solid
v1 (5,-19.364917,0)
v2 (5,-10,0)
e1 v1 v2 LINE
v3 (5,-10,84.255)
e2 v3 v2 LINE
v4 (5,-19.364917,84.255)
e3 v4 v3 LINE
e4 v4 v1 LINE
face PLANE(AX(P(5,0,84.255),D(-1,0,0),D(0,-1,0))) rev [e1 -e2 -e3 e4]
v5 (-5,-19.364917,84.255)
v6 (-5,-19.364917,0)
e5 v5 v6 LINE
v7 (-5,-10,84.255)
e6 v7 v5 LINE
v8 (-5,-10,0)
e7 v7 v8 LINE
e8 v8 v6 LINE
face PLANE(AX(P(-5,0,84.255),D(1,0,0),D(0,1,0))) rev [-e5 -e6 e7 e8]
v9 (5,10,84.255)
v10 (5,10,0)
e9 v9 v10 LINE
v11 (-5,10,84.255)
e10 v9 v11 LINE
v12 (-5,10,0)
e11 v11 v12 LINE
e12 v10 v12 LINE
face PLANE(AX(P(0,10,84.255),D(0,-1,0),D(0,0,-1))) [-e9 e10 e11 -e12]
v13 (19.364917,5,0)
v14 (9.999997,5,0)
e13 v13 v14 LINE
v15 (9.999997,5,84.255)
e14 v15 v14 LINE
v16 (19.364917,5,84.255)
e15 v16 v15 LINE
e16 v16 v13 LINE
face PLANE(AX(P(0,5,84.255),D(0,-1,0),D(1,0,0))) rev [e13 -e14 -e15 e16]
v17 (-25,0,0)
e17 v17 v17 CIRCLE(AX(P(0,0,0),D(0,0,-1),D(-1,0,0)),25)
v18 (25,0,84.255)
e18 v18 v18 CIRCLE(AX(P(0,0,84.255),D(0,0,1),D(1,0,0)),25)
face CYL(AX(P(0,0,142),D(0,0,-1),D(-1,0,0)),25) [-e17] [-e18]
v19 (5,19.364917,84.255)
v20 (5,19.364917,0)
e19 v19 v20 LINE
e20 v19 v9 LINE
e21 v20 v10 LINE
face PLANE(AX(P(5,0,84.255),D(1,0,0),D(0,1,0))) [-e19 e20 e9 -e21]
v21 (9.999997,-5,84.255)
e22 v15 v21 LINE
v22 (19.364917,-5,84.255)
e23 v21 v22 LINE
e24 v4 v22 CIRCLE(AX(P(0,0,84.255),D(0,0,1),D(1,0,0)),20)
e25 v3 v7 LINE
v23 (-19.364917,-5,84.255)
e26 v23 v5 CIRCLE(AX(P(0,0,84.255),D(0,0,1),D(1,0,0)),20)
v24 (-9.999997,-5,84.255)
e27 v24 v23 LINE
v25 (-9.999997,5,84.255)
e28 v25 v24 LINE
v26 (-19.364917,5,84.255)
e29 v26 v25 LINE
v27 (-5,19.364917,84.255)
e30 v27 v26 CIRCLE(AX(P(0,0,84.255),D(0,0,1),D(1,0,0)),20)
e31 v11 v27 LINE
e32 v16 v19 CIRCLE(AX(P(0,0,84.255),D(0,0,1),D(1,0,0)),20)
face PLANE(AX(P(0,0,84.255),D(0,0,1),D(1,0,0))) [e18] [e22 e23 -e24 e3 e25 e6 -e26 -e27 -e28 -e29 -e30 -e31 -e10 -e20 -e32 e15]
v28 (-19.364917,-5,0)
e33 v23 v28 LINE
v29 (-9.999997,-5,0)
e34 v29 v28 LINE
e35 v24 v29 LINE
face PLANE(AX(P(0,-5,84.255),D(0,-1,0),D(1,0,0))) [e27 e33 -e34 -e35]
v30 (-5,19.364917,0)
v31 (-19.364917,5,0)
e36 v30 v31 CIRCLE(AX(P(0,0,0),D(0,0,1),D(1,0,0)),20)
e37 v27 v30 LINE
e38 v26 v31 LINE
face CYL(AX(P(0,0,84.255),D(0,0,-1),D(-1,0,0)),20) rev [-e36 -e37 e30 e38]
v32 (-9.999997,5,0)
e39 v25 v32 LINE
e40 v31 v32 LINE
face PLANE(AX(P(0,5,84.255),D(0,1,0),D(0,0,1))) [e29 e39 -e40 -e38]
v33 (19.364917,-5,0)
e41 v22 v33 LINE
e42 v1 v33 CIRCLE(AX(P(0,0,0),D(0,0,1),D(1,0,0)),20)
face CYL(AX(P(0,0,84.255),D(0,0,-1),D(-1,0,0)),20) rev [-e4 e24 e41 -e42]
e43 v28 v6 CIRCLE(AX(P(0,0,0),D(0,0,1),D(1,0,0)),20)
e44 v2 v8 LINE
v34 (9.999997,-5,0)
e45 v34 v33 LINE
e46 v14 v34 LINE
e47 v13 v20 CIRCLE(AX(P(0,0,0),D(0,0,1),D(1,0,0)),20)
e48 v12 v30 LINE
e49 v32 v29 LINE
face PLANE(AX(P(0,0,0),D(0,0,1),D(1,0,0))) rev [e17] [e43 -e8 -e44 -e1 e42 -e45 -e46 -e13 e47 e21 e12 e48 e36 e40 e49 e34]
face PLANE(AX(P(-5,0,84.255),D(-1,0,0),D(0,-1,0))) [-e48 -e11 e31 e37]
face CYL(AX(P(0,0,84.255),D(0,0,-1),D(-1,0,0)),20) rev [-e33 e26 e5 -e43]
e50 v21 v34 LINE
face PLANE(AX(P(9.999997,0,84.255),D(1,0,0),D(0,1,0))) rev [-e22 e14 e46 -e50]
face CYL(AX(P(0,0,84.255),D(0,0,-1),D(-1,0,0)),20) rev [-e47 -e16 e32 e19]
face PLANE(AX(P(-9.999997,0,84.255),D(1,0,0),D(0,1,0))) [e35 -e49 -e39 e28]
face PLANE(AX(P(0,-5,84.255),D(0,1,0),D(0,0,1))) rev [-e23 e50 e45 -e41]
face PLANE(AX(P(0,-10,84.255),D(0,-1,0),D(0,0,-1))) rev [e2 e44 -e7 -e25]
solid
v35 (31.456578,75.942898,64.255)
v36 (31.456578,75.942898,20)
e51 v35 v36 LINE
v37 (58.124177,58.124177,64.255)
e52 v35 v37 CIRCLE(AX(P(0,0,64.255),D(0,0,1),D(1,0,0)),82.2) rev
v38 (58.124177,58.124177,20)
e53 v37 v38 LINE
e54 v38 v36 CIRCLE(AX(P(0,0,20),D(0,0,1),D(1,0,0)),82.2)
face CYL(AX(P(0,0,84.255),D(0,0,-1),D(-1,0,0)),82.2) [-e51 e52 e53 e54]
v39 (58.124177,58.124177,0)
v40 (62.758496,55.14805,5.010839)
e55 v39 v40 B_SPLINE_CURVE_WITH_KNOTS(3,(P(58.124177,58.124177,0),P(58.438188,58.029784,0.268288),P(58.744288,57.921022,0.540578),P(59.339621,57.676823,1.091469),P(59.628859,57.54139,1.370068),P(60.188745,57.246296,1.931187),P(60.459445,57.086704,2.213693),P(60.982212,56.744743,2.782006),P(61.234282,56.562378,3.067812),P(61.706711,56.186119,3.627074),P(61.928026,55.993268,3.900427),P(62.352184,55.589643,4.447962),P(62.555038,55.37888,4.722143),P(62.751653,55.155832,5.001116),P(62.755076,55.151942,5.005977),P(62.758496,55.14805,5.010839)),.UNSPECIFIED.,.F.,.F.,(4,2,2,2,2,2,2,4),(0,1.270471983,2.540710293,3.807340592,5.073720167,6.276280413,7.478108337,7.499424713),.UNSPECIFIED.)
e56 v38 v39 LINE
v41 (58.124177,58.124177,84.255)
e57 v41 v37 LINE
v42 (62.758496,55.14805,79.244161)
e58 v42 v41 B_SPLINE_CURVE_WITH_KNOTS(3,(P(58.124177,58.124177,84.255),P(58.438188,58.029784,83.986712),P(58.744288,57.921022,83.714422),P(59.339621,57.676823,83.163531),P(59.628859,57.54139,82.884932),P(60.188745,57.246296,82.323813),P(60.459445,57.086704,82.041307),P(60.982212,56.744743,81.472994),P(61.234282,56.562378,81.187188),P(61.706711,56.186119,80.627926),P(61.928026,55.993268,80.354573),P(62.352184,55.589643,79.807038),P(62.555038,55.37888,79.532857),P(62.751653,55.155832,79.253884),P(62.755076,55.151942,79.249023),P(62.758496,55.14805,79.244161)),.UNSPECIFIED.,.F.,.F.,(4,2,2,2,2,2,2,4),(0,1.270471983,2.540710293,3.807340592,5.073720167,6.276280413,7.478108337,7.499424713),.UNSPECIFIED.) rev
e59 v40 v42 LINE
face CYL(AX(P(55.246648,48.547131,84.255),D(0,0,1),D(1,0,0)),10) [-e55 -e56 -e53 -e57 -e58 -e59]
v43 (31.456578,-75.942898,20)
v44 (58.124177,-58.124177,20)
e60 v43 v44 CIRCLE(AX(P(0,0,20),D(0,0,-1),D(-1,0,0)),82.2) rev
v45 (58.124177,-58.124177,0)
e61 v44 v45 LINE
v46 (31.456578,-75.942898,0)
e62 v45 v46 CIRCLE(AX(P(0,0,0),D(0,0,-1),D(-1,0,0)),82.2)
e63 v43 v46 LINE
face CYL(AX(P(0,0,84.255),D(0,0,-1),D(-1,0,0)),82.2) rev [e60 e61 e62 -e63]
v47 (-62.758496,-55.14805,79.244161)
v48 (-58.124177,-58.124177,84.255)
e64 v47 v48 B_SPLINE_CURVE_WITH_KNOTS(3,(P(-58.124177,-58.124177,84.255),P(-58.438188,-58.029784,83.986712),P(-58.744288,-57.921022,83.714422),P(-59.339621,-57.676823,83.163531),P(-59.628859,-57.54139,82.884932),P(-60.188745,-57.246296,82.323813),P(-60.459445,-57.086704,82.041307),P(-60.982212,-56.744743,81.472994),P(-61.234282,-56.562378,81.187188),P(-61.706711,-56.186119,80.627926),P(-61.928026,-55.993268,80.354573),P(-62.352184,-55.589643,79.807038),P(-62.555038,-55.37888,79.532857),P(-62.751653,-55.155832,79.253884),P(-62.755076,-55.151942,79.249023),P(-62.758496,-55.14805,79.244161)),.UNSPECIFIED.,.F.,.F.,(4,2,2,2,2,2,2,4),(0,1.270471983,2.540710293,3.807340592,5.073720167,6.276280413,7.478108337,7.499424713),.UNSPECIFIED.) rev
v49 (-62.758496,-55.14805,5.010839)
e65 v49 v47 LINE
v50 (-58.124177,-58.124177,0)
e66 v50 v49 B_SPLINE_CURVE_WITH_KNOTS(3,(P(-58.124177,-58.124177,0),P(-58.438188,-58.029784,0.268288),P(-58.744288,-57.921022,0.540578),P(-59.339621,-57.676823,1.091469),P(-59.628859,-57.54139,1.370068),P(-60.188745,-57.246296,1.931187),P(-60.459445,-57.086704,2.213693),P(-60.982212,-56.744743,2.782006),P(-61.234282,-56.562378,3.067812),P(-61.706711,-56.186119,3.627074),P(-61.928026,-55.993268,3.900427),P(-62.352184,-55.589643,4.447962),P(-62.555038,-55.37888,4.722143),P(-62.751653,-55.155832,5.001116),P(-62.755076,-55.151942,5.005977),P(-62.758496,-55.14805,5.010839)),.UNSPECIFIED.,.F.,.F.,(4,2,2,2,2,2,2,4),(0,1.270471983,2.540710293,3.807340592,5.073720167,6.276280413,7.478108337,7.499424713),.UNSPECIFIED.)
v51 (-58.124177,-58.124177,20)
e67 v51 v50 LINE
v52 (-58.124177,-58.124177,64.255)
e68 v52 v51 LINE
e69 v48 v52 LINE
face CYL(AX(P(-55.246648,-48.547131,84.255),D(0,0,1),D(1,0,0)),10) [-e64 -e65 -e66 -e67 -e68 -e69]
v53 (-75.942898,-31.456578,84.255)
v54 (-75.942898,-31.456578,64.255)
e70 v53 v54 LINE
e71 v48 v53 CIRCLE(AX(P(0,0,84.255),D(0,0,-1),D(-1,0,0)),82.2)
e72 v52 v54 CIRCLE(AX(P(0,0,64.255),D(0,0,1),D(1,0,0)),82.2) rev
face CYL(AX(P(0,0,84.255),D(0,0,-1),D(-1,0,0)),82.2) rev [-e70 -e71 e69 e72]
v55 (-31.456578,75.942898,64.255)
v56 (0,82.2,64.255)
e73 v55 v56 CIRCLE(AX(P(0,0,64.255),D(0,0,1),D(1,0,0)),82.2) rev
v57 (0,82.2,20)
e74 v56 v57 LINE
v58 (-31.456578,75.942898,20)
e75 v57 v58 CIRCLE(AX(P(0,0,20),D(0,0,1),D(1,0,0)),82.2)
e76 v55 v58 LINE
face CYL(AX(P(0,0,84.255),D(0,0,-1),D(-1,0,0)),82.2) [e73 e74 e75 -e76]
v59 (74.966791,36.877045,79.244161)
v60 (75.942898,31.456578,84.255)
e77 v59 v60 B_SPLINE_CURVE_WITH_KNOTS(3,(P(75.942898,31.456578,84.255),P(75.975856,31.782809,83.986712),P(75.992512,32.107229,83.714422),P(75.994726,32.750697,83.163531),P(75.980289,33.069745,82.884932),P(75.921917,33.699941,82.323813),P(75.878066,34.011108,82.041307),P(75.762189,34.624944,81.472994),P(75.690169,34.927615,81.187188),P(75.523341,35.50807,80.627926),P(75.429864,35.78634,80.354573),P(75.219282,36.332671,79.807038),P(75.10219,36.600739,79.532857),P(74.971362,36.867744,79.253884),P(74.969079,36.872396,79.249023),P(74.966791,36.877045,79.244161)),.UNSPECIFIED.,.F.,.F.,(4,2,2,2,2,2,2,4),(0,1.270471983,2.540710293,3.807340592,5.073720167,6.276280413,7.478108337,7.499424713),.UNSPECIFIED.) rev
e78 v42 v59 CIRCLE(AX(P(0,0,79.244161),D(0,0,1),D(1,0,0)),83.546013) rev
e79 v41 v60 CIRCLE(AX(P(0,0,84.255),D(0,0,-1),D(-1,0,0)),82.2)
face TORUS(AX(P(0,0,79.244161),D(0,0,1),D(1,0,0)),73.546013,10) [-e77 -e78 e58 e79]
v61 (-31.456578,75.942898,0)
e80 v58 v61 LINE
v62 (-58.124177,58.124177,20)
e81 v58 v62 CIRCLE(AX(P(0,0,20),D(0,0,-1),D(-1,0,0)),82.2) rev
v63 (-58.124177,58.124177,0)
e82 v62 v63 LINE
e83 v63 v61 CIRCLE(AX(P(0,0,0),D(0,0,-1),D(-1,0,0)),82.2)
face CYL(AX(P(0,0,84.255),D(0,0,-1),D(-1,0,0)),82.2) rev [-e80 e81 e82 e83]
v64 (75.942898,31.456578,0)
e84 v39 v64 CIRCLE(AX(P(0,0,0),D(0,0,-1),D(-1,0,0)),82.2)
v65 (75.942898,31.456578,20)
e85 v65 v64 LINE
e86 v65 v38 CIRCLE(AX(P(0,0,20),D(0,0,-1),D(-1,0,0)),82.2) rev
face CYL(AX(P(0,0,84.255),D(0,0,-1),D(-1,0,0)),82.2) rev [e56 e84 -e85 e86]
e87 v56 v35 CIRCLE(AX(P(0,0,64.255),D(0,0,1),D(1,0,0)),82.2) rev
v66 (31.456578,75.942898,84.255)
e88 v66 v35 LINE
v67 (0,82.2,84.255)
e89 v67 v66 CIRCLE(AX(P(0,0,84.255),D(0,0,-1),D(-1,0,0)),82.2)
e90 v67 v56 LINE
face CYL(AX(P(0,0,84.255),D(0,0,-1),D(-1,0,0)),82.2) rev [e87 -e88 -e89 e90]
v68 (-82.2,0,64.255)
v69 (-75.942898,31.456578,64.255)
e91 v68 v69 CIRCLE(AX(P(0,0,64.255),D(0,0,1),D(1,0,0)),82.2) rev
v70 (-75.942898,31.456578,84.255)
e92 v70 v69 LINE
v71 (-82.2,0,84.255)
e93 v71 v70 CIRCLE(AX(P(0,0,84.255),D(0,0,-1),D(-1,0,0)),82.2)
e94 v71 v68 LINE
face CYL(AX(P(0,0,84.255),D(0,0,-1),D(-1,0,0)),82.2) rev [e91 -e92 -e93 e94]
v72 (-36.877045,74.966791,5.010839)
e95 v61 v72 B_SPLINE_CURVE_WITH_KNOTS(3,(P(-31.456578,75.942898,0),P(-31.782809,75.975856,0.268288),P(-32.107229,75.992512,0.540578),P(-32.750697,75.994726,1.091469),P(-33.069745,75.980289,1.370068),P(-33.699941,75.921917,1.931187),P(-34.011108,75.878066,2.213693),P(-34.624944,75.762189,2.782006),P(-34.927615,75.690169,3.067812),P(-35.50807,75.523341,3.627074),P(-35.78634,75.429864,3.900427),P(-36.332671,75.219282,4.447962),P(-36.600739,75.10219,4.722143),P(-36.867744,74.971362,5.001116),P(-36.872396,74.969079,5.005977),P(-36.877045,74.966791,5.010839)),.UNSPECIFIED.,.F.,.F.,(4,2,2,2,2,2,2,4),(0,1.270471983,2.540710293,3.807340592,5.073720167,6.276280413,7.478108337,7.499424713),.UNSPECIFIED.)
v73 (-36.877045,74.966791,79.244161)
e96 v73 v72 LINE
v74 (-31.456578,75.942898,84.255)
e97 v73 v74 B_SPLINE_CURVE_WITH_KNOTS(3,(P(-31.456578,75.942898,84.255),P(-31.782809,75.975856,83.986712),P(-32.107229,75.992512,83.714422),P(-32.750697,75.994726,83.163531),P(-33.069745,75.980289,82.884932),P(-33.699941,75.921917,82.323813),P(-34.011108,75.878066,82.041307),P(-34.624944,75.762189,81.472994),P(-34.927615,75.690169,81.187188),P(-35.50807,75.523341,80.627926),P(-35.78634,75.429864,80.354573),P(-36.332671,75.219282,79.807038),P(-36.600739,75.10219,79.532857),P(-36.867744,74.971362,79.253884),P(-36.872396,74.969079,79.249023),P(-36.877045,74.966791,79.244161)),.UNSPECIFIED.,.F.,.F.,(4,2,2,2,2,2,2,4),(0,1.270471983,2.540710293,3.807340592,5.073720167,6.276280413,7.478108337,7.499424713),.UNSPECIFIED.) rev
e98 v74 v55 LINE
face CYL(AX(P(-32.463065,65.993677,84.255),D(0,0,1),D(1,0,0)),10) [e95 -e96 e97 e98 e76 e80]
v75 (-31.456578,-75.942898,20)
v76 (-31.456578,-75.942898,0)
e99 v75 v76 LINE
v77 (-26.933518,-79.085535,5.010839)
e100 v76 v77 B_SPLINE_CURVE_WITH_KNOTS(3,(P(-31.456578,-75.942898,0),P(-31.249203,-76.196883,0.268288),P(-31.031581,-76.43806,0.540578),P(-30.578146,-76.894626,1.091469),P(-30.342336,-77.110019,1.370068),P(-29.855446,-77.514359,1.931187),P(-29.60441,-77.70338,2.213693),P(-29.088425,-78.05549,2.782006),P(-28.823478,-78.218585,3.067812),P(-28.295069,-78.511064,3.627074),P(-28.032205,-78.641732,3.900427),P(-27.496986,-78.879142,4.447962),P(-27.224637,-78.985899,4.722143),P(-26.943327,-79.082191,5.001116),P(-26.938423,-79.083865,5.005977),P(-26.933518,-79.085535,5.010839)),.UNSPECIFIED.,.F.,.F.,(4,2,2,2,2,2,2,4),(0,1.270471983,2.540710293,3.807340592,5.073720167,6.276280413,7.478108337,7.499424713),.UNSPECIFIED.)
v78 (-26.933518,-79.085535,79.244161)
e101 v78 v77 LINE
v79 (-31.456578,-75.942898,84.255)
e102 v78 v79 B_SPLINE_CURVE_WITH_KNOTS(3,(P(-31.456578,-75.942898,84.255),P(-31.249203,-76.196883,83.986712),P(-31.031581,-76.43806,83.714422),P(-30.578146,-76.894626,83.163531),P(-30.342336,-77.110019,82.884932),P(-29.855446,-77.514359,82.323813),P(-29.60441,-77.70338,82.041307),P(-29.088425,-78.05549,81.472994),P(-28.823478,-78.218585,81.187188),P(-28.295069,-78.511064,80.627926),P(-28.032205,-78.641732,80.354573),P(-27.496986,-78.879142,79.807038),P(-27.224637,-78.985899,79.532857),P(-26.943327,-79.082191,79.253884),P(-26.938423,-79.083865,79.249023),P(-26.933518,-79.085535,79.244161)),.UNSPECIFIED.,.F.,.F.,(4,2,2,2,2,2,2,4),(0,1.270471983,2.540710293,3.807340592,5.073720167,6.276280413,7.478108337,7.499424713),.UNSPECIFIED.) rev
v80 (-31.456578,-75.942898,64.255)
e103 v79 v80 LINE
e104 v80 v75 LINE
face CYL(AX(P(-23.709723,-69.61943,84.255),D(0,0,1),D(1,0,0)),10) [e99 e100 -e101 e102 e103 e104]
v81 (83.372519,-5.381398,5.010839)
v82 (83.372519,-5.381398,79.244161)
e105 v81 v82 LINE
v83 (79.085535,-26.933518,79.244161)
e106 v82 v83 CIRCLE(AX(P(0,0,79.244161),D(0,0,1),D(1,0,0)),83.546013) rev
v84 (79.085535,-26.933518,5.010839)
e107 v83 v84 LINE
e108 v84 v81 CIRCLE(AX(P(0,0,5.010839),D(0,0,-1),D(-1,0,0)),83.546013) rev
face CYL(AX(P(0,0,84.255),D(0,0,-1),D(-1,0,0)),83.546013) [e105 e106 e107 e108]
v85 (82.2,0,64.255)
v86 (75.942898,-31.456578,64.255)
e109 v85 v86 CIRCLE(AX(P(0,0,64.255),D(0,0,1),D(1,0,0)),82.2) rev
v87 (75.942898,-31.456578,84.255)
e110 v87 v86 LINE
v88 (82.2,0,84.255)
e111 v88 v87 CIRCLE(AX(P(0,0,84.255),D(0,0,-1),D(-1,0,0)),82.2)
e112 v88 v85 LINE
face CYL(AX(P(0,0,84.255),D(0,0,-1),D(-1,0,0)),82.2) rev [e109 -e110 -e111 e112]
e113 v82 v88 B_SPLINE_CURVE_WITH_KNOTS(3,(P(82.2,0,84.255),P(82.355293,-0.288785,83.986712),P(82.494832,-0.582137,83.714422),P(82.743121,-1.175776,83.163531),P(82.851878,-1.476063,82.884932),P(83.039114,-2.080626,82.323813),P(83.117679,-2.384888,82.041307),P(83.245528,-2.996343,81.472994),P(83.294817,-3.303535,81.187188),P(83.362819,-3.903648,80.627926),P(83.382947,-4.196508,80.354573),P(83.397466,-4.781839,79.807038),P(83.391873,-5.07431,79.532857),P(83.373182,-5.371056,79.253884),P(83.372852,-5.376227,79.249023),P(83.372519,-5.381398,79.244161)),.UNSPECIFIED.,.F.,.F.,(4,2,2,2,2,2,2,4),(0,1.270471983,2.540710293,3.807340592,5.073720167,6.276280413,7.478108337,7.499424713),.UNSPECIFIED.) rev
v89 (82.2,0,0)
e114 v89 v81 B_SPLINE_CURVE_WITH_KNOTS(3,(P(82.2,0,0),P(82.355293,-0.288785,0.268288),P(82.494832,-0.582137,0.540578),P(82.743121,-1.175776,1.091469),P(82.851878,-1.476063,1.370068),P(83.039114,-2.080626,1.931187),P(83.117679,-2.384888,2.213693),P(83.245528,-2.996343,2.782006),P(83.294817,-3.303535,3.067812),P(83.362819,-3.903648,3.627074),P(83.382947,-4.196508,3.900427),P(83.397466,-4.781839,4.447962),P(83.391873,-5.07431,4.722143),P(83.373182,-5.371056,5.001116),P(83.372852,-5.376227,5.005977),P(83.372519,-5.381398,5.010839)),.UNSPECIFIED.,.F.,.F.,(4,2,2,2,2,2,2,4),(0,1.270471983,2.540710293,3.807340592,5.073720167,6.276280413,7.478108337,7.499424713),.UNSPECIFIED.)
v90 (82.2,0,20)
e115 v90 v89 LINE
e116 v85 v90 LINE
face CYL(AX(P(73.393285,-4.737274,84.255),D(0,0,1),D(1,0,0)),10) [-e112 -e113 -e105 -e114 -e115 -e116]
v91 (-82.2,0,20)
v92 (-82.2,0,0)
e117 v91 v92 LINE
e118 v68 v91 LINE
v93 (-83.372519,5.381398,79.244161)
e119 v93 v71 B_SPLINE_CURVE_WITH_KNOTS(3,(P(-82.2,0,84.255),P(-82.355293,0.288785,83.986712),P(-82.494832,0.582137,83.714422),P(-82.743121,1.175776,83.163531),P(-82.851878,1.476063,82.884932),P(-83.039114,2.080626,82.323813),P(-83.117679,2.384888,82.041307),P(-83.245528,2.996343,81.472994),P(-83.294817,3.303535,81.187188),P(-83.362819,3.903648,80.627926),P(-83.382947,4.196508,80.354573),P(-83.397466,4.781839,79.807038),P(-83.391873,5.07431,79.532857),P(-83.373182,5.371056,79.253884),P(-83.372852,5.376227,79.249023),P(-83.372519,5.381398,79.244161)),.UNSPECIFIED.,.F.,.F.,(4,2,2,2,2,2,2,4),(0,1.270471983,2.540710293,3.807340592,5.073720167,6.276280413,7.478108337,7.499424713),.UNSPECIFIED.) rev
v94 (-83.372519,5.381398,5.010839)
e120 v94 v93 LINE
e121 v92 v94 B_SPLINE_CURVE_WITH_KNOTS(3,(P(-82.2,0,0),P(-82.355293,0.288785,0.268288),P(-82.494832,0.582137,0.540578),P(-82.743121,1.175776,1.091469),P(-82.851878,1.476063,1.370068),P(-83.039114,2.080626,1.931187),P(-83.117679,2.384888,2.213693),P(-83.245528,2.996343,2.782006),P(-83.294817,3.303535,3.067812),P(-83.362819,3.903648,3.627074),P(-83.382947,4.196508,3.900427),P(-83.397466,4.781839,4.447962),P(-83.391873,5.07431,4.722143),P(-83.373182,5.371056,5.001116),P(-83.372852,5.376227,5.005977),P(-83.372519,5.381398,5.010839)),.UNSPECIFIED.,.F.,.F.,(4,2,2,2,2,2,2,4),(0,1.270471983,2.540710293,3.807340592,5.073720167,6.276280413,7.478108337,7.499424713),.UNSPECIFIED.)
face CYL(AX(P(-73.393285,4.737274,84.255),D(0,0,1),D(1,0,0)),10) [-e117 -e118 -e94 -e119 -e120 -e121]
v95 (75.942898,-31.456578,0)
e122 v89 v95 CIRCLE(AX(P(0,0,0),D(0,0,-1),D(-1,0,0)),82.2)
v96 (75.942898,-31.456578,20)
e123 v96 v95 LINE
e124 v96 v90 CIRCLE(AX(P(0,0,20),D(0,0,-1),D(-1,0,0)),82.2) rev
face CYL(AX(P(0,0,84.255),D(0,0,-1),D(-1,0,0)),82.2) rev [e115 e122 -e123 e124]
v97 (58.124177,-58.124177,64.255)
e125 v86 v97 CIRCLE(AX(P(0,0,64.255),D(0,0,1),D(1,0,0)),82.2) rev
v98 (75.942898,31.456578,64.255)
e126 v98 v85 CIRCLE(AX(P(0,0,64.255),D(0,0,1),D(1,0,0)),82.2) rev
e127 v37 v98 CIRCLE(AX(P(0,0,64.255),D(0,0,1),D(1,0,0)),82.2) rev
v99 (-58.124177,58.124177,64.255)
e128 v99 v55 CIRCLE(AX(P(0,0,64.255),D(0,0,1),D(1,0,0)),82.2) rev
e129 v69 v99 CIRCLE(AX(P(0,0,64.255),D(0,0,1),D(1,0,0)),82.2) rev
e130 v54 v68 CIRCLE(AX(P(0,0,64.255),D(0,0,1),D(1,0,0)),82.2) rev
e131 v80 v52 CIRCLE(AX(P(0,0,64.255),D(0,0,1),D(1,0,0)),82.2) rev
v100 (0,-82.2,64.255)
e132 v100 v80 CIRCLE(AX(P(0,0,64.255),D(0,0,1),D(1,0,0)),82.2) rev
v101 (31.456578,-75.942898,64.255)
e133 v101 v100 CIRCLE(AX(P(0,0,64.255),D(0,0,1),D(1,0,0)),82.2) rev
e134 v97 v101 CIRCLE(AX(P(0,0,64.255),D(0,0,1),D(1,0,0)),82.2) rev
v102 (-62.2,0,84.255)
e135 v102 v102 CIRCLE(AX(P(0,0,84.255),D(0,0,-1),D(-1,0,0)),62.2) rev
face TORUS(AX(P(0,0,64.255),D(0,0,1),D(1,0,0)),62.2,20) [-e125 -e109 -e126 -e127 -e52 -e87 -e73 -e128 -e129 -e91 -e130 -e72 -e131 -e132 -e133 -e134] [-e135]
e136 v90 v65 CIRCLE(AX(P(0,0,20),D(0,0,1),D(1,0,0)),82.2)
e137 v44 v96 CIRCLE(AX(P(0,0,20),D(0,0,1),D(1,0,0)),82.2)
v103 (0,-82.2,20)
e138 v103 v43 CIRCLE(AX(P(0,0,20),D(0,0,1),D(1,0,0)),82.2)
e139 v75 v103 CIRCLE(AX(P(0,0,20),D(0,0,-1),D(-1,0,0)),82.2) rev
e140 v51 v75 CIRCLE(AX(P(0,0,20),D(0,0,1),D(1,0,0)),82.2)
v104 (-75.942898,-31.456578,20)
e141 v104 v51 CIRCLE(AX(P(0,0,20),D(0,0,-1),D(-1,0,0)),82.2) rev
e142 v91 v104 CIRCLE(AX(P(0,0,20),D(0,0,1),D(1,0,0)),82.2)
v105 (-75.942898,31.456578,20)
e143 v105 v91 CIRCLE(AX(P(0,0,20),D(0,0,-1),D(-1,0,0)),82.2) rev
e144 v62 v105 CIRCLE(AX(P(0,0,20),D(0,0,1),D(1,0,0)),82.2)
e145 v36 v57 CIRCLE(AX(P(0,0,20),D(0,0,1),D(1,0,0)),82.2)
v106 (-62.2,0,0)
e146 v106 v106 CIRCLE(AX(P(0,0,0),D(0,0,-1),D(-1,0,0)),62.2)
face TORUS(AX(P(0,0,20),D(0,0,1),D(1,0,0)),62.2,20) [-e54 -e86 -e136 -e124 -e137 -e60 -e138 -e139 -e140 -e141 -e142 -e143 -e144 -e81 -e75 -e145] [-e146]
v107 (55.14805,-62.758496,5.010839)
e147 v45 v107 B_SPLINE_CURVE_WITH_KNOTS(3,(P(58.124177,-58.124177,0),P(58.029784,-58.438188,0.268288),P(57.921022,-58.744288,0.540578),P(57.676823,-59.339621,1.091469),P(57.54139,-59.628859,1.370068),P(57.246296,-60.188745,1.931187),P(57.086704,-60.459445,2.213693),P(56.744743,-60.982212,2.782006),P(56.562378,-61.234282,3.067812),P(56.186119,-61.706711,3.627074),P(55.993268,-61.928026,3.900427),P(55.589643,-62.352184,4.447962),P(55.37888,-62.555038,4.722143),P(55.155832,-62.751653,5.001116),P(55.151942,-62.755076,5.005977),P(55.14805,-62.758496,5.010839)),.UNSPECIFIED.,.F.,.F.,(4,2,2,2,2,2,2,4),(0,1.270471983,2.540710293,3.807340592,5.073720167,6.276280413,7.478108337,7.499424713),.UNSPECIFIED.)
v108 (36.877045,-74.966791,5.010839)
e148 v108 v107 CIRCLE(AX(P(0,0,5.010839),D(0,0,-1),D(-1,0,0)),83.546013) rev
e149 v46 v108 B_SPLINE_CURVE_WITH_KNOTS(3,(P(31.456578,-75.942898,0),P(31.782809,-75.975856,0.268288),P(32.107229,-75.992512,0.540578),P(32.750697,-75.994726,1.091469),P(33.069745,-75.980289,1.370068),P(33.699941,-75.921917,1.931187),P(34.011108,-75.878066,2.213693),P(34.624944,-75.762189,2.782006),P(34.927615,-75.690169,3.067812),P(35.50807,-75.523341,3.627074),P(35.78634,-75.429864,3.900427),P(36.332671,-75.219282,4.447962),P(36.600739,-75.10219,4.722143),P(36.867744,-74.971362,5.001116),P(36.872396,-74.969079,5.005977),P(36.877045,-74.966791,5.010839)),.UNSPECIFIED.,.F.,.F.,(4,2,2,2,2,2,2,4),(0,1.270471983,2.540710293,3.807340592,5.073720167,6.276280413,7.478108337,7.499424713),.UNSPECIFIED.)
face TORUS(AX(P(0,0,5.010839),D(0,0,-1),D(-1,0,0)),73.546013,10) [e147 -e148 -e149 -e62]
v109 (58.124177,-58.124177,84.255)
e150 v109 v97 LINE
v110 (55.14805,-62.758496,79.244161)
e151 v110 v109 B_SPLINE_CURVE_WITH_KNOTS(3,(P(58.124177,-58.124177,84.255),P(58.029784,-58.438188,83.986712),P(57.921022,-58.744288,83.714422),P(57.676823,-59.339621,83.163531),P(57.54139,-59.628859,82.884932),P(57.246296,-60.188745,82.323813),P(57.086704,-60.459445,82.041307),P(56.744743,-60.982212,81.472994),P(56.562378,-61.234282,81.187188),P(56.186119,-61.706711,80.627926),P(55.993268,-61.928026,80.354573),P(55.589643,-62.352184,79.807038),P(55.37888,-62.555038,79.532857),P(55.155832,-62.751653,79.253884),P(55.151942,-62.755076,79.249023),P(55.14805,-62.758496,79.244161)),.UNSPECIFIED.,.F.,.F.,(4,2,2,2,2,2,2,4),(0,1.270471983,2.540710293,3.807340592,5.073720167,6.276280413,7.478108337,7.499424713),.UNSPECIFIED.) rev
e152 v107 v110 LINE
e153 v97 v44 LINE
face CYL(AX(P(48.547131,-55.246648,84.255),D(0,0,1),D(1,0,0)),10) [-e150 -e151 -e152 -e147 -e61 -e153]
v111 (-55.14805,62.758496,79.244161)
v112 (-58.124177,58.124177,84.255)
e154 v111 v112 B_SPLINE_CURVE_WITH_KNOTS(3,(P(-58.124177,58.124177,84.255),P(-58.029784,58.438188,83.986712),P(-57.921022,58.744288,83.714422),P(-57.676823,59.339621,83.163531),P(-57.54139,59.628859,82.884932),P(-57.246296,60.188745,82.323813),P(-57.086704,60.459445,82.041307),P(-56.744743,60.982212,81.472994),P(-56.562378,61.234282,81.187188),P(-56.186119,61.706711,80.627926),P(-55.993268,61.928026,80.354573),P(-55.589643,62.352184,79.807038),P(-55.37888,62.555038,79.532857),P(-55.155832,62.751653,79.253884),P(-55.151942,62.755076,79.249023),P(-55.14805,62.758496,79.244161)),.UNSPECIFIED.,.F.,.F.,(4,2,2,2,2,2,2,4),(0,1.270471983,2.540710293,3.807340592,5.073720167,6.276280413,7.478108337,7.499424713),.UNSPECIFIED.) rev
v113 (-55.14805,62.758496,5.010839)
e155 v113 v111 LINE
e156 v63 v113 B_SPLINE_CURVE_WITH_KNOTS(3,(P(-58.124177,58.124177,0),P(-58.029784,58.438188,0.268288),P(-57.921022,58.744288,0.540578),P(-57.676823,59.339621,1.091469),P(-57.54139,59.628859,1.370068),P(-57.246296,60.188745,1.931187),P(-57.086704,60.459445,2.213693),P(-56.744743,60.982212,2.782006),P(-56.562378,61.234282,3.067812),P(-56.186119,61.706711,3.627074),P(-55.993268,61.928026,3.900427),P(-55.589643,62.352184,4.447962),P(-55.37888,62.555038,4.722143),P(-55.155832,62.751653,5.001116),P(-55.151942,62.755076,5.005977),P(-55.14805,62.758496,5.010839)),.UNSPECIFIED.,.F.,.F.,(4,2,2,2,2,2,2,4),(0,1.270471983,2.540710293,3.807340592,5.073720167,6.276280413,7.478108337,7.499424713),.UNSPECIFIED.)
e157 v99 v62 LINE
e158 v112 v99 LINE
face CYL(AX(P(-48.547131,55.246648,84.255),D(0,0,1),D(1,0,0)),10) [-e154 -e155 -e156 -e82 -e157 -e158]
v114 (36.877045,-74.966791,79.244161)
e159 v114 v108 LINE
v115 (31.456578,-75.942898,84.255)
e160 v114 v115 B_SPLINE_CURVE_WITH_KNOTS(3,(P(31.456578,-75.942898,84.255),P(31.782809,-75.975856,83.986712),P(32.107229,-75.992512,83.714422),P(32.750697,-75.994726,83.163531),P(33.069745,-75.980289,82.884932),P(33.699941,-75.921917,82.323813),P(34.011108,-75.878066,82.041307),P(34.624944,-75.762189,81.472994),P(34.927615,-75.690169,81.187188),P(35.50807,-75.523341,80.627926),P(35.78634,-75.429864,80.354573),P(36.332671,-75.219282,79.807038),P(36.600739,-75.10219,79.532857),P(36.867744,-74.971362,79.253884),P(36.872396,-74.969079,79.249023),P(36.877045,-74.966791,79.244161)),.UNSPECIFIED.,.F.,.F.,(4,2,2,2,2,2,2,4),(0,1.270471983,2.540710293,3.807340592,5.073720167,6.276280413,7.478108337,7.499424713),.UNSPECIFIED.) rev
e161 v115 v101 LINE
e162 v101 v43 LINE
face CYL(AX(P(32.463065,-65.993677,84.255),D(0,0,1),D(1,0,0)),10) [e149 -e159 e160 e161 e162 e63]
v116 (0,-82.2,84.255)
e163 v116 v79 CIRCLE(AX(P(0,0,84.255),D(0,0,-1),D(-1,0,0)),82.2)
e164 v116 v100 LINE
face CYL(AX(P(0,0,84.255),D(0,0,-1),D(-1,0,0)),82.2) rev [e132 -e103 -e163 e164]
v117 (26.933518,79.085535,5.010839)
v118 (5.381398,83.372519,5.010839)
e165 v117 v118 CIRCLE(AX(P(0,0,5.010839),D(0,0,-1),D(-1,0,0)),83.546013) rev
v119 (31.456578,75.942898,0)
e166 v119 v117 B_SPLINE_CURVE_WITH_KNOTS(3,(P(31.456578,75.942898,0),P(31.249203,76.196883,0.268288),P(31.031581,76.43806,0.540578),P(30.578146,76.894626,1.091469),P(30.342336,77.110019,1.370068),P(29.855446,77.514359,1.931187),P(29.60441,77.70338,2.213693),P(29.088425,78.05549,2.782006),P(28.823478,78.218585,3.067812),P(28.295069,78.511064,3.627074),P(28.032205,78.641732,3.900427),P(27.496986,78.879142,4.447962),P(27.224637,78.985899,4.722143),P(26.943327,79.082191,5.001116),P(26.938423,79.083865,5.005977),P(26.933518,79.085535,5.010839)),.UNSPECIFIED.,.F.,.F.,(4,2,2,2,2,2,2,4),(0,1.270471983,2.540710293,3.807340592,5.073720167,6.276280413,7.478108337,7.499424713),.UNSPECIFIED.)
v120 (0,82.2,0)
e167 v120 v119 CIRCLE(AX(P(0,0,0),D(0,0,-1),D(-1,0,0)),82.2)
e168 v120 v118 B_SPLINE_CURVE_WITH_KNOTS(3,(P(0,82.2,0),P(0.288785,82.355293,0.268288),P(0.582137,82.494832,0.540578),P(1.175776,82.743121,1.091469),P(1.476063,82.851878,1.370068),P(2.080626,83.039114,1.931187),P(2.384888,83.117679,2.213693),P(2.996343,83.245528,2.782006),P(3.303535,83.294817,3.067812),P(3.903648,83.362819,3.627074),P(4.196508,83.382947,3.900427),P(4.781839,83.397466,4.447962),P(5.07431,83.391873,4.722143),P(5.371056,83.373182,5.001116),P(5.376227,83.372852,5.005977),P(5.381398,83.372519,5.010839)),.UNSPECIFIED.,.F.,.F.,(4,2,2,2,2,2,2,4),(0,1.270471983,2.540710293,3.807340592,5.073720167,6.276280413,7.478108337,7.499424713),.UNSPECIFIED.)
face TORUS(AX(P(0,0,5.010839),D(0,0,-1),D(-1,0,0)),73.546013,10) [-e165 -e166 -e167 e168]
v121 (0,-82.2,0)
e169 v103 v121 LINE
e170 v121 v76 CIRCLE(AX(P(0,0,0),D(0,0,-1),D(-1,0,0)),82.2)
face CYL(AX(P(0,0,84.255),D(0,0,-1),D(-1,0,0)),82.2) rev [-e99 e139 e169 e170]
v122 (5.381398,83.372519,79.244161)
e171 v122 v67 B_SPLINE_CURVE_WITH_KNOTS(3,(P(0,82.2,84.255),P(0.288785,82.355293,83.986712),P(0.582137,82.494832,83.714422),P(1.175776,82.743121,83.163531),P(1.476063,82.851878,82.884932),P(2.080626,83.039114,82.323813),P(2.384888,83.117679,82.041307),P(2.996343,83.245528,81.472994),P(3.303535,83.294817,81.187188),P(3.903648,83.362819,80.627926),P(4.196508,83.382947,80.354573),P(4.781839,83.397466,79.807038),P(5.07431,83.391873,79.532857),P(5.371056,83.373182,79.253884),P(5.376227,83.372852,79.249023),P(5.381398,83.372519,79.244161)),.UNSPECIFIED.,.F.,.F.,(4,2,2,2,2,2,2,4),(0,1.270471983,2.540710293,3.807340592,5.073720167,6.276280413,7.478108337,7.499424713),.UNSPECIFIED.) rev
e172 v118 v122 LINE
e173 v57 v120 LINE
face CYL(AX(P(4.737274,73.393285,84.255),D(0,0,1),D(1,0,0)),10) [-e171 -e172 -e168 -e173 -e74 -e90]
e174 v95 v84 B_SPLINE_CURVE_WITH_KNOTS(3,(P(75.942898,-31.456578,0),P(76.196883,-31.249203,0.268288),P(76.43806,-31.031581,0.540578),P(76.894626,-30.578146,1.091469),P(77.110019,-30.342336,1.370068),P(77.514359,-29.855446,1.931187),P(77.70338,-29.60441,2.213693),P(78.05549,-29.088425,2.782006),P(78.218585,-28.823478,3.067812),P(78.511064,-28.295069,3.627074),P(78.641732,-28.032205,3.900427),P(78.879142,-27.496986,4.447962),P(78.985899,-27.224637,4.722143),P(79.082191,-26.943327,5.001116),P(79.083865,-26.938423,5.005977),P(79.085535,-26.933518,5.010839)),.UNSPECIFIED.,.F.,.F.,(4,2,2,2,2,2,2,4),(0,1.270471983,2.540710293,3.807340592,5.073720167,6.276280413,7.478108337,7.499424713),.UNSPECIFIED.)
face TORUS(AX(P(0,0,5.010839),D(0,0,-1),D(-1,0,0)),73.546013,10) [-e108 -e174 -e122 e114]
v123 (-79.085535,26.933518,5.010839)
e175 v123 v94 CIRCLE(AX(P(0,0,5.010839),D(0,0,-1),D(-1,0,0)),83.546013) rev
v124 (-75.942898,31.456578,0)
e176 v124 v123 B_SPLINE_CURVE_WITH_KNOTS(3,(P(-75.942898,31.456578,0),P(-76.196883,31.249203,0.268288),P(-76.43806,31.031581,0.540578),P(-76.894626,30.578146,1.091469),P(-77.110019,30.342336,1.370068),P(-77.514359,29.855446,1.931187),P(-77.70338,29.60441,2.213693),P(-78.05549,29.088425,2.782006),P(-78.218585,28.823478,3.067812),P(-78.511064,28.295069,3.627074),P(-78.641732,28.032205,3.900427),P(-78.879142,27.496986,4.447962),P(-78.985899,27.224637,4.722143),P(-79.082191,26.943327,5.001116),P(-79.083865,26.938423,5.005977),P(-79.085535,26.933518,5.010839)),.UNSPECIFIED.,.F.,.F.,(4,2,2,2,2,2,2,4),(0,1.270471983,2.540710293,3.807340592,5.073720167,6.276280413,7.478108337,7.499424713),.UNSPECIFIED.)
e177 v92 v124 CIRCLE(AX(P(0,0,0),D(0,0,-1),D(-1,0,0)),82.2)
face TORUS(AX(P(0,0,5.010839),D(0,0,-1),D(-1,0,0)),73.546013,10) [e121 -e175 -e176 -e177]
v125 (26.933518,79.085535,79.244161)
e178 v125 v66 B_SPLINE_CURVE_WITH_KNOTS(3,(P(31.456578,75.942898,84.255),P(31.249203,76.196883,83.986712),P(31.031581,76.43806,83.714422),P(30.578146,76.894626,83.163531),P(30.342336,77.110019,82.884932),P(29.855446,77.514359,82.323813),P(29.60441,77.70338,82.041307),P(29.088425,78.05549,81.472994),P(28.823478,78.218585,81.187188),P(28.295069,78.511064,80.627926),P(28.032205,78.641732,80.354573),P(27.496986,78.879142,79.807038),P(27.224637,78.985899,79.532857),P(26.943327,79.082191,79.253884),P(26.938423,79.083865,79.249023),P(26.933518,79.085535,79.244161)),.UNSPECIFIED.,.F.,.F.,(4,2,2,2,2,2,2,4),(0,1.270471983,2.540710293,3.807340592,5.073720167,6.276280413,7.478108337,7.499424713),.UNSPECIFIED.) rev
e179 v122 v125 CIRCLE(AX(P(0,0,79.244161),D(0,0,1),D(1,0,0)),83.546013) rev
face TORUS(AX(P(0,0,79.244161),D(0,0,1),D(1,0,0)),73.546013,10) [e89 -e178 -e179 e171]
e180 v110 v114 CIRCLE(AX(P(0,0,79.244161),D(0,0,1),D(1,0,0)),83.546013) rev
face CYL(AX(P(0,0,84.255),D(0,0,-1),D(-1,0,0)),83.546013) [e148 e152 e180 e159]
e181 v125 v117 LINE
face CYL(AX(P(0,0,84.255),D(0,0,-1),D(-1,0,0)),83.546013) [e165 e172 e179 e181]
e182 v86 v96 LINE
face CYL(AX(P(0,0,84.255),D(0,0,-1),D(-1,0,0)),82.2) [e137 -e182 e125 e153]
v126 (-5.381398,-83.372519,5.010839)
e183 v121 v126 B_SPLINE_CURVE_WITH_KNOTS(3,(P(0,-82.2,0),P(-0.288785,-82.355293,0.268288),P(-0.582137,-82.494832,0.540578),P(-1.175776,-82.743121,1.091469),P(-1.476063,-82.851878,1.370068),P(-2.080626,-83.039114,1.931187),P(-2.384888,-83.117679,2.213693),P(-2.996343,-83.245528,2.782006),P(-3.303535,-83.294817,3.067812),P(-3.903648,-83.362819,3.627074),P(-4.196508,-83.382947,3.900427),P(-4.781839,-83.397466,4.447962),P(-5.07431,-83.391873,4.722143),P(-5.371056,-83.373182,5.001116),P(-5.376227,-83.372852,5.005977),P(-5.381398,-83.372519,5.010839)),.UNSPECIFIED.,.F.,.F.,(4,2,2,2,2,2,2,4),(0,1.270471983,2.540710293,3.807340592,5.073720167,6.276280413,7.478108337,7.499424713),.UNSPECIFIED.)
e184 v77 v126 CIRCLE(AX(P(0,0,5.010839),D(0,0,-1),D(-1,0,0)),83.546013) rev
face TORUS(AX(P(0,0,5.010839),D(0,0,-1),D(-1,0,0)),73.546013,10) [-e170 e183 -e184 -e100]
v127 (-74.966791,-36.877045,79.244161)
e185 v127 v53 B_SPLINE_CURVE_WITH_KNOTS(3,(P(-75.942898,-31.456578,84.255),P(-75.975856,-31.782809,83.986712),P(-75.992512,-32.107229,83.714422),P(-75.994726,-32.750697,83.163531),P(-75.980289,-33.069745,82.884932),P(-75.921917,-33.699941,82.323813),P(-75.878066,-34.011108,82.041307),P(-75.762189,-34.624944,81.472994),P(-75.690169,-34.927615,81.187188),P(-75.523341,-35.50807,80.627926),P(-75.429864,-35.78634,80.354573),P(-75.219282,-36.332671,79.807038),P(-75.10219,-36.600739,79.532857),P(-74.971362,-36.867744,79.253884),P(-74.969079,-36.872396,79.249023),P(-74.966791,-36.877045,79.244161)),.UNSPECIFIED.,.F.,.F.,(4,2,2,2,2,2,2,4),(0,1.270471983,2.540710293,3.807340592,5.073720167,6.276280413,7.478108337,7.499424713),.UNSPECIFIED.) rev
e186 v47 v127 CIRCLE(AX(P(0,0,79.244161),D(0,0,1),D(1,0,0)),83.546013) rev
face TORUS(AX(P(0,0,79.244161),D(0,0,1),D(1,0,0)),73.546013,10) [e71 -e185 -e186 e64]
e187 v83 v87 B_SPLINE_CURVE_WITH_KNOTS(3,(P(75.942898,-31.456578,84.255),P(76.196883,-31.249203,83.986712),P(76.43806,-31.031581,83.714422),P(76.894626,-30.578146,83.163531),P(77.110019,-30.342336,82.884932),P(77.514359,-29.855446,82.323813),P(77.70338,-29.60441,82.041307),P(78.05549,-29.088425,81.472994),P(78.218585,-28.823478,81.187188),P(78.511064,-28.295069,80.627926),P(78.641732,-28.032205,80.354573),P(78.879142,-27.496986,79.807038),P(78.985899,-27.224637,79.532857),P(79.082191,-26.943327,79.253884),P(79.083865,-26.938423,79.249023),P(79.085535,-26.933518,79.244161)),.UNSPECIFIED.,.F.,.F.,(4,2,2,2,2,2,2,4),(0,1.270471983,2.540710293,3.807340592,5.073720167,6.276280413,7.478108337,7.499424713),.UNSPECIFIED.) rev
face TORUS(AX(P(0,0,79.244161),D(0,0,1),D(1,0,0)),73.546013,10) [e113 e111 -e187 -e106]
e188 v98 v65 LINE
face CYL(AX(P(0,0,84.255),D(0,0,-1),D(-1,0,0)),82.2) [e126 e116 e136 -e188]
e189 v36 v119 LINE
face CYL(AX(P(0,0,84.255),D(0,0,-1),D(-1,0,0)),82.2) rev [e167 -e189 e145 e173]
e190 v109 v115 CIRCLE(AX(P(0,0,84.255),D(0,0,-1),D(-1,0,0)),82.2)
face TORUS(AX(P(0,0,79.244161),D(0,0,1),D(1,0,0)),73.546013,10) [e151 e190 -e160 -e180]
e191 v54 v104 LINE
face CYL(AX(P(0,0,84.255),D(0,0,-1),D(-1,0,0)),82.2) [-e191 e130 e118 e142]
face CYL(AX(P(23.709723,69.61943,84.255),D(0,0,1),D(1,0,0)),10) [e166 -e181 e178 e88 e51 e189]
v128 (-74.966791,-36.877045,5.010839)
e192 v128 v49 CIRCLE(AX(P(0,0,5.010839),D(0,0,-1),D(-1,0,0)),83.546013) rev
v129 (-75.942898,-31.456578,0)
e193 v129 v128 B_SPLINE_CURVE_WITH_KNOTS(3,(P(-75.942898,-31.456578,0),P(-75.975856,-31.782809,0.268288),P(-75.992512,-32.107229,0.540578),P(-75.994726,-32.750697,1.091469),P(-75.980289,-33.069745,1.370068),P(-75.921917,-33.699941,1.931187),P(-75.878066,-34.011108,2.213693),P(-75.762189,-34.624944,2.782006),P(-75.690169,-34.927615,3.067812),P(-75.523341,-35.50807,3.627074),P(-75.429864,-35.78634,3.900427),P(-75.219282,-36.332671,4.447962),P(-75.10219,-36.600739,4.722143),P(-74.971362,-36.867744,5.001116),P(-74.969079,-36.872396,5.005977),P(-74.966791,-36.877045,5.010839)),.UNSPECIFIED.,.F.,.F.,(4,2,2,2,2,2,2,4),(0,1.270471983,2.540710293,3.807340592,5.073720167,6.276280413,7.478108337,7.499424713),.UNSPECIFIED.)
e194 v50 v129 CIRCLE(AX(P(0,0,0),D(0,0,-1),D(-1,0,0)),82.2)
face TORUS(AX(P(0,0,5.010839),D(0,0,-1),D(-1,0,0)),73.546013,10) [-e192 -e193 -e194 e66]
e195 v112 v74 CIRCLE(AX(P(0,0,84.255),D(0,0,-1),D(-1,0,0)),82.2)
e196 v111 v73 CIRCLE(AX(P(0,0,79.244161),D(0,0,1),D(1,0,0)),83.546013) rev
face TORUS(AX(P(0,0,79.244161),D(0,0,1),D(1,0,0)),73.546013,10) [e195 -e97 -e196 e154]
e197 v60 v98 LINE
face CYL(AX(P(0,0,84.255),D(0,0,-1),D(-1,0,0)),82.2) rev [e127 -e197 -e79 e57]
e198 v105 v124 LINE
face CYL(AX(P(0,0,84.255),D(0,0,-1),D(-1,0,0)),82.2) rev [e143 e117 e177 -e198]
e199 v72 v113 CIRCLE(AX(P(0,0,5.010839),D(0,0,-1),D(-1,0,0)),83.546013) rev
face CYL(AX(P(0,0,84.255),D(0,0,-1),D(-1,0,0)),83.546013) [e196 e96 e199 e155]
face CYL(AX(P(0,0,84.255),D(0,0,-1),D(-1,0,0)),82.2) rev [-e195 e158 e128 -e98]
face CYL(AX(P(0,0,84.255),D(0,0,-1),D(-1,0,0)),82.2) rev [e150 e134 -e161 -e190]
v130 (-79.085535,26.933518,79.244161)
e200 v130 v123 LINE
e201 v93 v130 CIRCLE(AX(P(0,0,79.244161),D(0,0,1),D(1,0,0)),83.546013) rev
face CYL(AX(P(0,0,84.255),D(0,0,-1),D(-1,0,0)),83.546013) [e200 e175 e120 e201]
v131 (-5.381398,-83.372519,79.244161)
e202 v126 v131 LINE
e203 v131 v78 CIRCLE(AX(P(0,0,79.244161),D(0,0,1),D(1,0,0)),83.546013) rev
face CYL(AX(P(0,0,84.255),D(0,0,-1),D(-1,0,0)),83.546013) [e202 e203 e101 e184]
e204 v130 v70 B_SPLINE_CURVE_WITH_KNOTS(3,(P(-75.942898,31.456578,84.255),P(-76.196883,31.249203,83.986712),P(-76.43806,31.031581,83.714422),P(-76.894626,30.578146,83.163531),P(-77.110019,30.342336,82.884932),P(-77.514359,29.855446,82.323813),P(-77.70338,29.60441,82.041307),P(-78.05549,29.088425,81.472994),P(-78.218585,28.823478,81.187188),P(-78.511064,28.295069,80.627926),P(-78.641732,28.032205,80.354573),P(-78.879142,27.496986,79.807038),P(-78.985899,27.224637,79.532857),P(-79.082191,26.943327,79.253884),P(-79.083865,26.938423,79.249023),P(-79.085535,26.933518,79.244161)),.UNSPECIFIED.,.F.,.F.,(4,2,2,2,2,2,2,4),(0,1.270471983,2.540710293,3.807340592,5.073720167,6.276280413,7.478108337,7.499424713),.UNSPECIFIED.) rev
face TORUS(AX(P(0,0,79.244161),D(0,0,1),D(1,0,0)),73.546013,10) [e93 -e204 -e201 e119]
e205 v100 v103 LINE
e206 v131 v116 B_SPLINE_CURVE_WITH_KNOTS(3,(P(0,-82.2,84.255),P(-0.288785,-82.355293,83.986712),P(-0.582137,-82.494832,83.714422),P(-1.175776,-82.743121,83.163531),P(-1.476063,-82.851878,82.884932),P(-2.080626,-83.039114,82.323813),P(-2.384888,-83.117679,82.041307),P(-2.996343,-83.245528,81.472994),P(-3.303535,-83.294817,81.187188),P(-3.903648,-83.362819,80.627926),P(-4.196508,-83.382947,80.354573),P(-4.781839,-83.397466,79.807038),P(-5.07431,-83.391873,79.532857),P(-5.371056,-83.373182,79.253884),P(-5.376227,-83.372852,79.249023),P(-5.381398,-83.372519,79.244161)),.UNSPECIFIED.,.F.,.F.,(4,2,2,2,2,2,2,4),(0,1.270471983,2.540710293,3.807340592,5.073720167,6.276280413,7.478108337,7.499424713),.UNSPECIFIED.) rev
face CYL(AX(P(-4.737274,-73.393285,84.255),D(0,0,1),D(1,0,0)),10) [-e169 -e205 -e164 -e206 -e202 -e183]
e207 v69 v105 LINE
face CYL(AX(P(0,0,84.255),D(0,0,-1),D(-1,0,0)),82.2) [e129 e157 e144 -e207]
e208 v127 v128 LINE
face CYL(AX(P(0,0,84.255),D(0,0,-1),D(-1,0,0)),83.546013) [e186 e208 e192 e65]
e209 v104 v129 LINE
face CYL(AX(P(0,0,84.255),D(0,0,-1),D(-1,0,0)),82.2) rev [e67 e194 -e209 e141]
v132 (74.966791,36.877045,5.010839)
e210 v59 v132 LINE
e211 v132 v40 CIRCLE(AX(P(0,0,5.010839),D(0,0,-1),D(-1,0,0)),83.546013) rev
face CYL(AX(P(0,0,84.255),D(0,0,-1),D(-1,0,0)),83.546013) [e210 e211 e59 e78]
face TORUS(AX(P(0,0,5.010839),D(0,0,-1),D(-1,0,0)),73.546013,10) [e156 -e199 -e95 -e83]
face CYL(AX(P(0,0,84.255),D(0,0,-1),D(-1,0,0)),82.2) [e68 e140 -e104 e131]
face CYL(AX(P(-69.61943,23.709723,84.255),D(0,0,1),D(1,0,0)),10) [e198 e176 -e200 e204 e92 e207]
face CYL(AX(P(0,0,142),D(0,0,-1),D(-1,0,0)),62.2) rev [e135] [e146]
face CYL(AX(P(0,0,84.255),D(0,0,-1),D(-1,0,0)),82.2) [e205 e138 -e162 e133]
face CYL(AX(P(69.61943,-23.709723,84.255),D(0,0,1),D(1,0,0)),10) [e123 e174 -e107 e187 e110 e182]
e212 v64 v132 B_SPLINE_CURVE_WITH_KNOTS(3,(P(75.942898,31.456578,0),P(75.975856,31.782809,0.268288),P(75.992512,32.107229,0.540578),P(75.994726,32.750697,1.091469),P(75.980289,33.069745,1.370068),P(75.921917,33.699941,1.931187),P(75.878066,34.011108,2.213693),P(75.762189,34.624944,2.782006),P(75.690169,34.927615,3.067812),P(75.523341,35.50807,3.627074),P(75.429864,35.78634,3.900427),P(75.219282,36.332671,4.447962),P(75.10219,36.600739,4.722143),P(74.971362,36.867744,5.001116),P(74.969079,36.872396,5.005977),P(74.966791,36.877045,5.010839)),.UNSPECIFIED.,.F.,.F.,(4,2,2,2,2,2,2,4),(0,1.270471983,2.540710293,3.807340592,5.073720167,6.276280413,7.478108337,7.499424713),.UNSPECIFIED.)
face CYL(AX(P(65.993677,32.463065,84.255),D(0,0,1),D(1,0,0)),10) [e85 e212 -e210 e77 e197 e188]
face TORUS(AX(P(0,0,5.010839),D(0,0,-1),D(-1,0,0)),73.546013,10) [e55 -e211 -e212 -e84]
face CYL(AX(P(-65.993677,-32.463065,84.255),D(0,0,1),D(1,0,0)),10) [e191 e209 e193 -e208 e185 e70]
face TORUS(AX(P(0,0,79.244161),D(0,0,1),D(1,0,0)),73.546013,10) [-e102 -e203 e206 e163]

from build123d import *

# Parameters (mm, degrees)
SKETCH1_R           = 82.2
SKETCH1_R_2         = 20
BOSS_EXTRUDE1_DEPTH = 84.255
BOSS_EXTRUDE2_DEPTH = 84.255
FILLET1_R           = 20
SKETCH3_R           = 62.2
SKETCH3_R_2         = 25
CUT_EXTRUDE1_DEPTH  = 142
BOSS_EXTRUDE3_DEPTH = 84.255
FILLET2_DEPTH       = 84.255


with BuildPart() as part:
    # Sketch1 → Boss-Extrude1 (new body)
    with BuildSketch(Plane.XY):
        Circle(SKETCH1_R)
        Circle(SKETCH1_R_2, mode=Mode.SUBTRACT)
    extrude(amount=BOSS_EXTRUDE1_DEPTH)

    # Sketch2 → Boss-Extrude2 (add)
    with BuildSketch(Plane(origin=(0, 0, 0), x_dir=(-1, 0, 0), z_dir=(0, 0, -1))):
        with BuildLine():
            ThreePointArc((20, 0), (19.840593925, 2.52008585), (19.364916731, 5))
            Line((19.364916731, 5), (9.999996731, 5))
            Line((9.999996731, 5), (9.999996731, -5))
            Line((9.999996731, -5), (19.364916731, -5))
            ThreePointArc((19.364916731, -5), (19.840593925, -2.52008585), (20, 0))
        make_face()
        with BuildLine():
            ThreePointArc((5, 19.364916731), (0, 20), (-5, 19.364916731))
            Line((-5, 19.364916731), (-5, 10))
            Line((-5, 10), (5, 10))
            Line((5, 10), (5, 19.364916731))
        make_face()
        with BuildLine():
            Line((-9.999996731, 5), (-19.364916731, 5))
            ThreePointArc((-19.364916731, 5), (-20, 0), (-19.364916731, -5))
            Line((-19.364916731, -5), (-9.999996731, -5))
            Line((-9.999996731, -5), (-9.999996731, 5))
        make_face()
        with BuildLine():
            Line((-5, -10), (-5, -19.364916731))
            ThreePointArc((-5, -19.364916731), (0, -20), (5, -19.364916731))
            Line((5, -19.364916731), (5, -10))
            Line((5, -10), (-5, -10))
        make_face()
    extrude(amount=-BOSS_EXTRUDE2_DEPTH)

    # Fillet1
    fillet1_edges = [part.edges().sort_by_distance(p)[0] for p in [
        (-82.2, 0, 0),
        (-82.2, 0, 84.255),
    ]]
    fillet(fillet1_edges, radius=FILLET1_R)

    # Sketch3 → Cut-Extrude1 (cut)
    with BuildSketch(Plane(origin=(0, 0, 0), x_dir=(-1, 0, 0), z_dir=(0, 0, -1))):
        Circle(SKETCH3_R)
        Circle(SKETCH3_R_2, mode=Mode.SUBTRACT)
    extrude(amount=-CUT_EXTRUDE1_DEPTH, mode=Mode.SUBTRACT)


with BuildPart() as cut_extrude1_piece_1:
    # of the separate pieces the step leaves, piece 1, a body of its own (cut_extrude1_pieces)
    add(part.part.solids().sort_by_distance((82.2, 0, 20))[0])

    # Sketch5 → Boss-Extrude3 (add)
    with BuildSketch(Plane(origin=(0, 0, 0), x_dir=(-1, 0, 0), z_dir=(0, 0, -1))):
        with BuildLine():
            ThreePointArc((-31.45657814, 75.942897572), (-16.03642447, 80.620550049), (0, 82.2))
            Line((0, 82.2), (0, 83.546013048))
            ThreePointArc((0, 83.546013048), (-16.299018589, 81.940699834), (-31.971675034, 77.186451478))
            Line((-31.971675034, 77.186451478), (-31.45657814, 75.942897572))
        make_face()
        with BuildLine():
            ThreePointArc((-75.942897572, 31.45657814), (-68.346802131, 45.667873154), (-58.124177414, 58.124177414))
            Line((-58.124177414, 58.124177414), (-59.075952367, 59.075952367))
            ThreePointArc((-59.075952367, 59.075952367), (-69.465971078, 46.415677937), (-77.186451478, 31.971675034))
            Line((-77.186451478, 31.971675034), (-75.942897572, 31.45657814))
        make_face()
        with BuildLine():
            ThreePointArc((-75.942897572, -31.45657814), (-80.620550049, -16.03642447), (-82.2, 0))
            Line((-82.2, 0), (-83.546013048, 0))
            ThreePointArc((-83.546013048, 0), (-81.940699834, -16.299018589), (-77.186451478, -31.971675034))
            Line((-77.186451478, -31.971675034), (-75.942897572, -31.45657814))
        make_face()
        with BuildLine():
            ThreePointArc((-31.45657814, -75.942897572), (-45.667873154, -68.346802131), (-58.124177414, -58.124177414))
            Line((-58.124177414, -58.124177414), (-59.075952367, -59.075952367))
            ThreePointArc((-59.075952367, -59.075952367), (-46.415677937, -69.465971078), (-31.971675034, -77.186451478))
            Line((-31.971675034, -77.186451478), (-31.45657814, -75.942897572))
        make_face()
        with BuildLine():
            ThreePointArc((31.45657814, -75.942897572), (16.03642447, -80.620550049), (0, -82.2))
            Line((0, -82.2), (0, -83.546013048))
            ThreePointArc((0, -83.546013048), (16.299018589, -81.940699834), (31.971675034, -77.186451478))
            Line((31.971675034, -77.186451478), (31.45657814, -75.942897572))
        make_face()
        with BuildLine():
            ThreePointArc((75.942897572, -31.45657814), (68.346802131, -45.667873154), (58.124177414, -58.124177414))
            Line((58.124177414, -58.124177414), (59.075952367, -59.075952367))
            ThreePointArc((59.075952367, -59.075952367), (69.465971078, -46.415677937), (77.186451478, -31.971675034))
            Line((77.186451478, -31.971675034), (75.942897572, -31.45657814))
        make_face()
        with BuildLine():
            ThreePointArc((75.942897572, 31.45657814), (80.620550049, 16.03642447), (82.2, 0))
            Line((82.2, 0), (83.546013048, 0))
            ThreePointArc((83.546013048, 0), (81.940699834, 16.299018589), (77.186451478, 31.971675034))
            Line((77.186451478, 31.971675034), (75.942897572, 31.45657814))
        make_face()
        with BuildLine():
            ThreePointArc((31.45657814, 75.942897572), (45.667873154, 68.346802131), (58.124177414, 58.124177414))
            Line((58.124177414, 58.124177414), (59.075952367, 59.075952367))
            ThreePointArc((59.075952367, 59.075952367), (46.415677937, 69.465971078), (31.971675034, 77.186451478))
            Line((31.971675034, 77.186451478), (31.45657814, 75.942897572))
        make_face()
    extrude(amount=-BOSS_EXTRUDE3_DEPTH)

    # Fillet2: read off the stored shape, not the designer's step
    # Fillet2 outline → Fillet2 (cut)
    with BuildSketch(Plane.XY):
        with BuildLine():
            ThreePointArc((0, 82.2), (2.608384979, 83.164048917), (5.381398308, 83.372518544))
            ThreePointArc((5.381398308, 83.372518544), (2.692097142, 83.502628157), (0, 83.546013048))
            Line((0, 83.546013048), (0, 82.2))
        make_face()
        with BuildLine():
            ThreePointArc((31.971675034, 77.186451478), (29.467898906, 78.17659004), (26.933517808, 79.085535433))
            ThreePointArc((26.933517808, 79.085535433), (29.415670194, 77.831748352), (31.45657814, 75.942897572))
            Line((31.45657814, 75.942897572), (31.971675034, 77.186451478))
        make_face()
        with BuildLine():
            ThreePointArc((-58.124177414, 58.124177414), (-56.961456234, 60.650269647), (-55.148049991, 62.758496463))
            ThreePointArc((-55.148049991, 62.758496463), (-57.141674472, 60.948874762), (-59.075952367, 59.075952367))
            Line((-59.075952367, 59.075952367), (-58.124177414, 58.124177414))
        make_face()
        with BuildLine():
            ThreePointArc((-31.971675034, 77.186451478), (-34.442245804, 76.116148091), (-36.877045315, 74.966791481))
            ThreePointArc((-36.877045315, 74.966791481), (-34.235337184, 75.835376919), (-31.45657814, 75.942897572))
            Line((-31.45657814, 75.942897572), (-31.971675034, 77.186451478))
        make_face()
        with BuildLine():
            ThreePointArc((-82.2, 0), (-83.164048917, 2.608384979), (-83.372518544, 5.381398308))
            ThreePointArc((-83.372518544, 5.381398308), (-83.502628157, 2.692097142), (-83.546013048, 0))
            Line((-83.546013048, 0), (-82.2, 0))
        make_face()
        with BuildLine():
            ThreePointArc((-77.186451478, 31.971675034), (-78.17659004, 29.467898906), (-79.085535433, 26.933517808))
            ThreePointArc((-79.085535433, 26.933517808), (-77.831748352, 29.415670194), (-75.942897572, 31.45657814))
            Line((-75.942897572, 31.45657814), (-77.186451478, 31.971675034))
        make_face()
        with BuildLine():
            ThreePointArc((-58.124177414, -58.124177414), (-60.650269647, -56.961456234), (-62.758496463, -55.148049991))
            ThreePointArc((-62.758496463, -55.148049991), (-60.948874762, -57.141674472), (-59.075952367, -59.075952367))
            Line((-59.075952367, -59.075952367), (-58.124177414, -58.124177414))
        make_face()
        with BuildLine():
            ThreePointArc((-77.186451478, -31.971675034), (-76.116148091, -34.442245804), (-74.966791481, -36.877045315))
            ThreePointArc((-74.966791481, -36.877045315), (-75.835376919, -34.235337184), (-75.942897572, -31.45657814))
            Line((-75.942897572, -31.45657814), (-77.186451478, -31.971675034))
        make_face()
        with BuildLine():
            ThreePointArc((0, -82.2), (-2.608384979, -83.164048917), (-5.381398308, -83.372518544))
            ThreePointArc((-5.381398308, -83.372518544), (-2.692097142, -83.502628157), (0, -83.546013048))
            Line((0, -83.546013048), (0, -82.2))
        make_face()
        with BuildLine():
            ThreePointArc((-31.971675034, -77.186451478), (-29.467898906, -78.17659004), (-26.933517808, -79.085535433))
            ThreePointArc((-26.933517808, -79.085535433), (-29.415670194, -77.831748352), (-31.45657814, -75.942897572))
            Line((-31.45657814, -75.942897572), (-31.971675034, -77.186451478))
        make_face()
        with BuildLine():
            ThreePointArc((58.124177414, -58.124177414), (56.961456234, -60.650269647), (55.148049991, -62.758496463))
            ThreePointArc((55.148049991, -62.758496463), (57.141674472, -60.948874762), (59.075952367, -59.075952367))
            Line((59.075952367, -59.075952367), (58.124177414, -58.124177414))
        make_face()
        with BuildLine():
            ThreePointArc((31.971675034, -77.186451478), (34.442245804, -76.116148091), (36.877045315, -74.966791481))
            ThreePointArc((36.877045315, -74.966791481), (34.235337184, -75.835376919), (31.45657814, -75.942897572))
            Line((31.45657814, -75.942897572), (31.971675034, -77.186451478))
        make_face()
        with BuildLine():
            ThreePointArc((82.2, 0), (83.164048917, -2.608384979), (83.372518544, -5.381398308))
            ThreePointArc((83.372518544, -5.381398308), (83.502628157, -2.692097142), (83.546013048, 0))
            Line((83.546013048, 0), (82.2, 0))
        make_face()
        with BuildLine():
            ThreePointArc((77.186451478, -31.971675034), (78.17659004, -29.467898906), (79.085535433, -26.933517808))
            ThreePointArc((79.085535433, -26.933517808), (77.831748352, -29.415670194), (75.942897572, -31.45657814))
            Line((75.942897572, -31.45657814), (77.186451478, -31.971675034))
        make_face()
        with BuildLine():
            ThreePointArc((58.124177414, 58.124177414), (60.650269647, 56.961456234), (62.758496463, 55.148049991))
            ThreePointArc((62.758496463, 55.148049991), (60.948874762, 57.141674472), (59.075952367, 59.075952367))
            Line((59.075952367, 59.075952367), (58.124177414, 58.124177414))
        make_face()
        with BuildLine():
            ThreePointArc((77.186451478, 31.971675034), (76.116148091, 34.442245804), (74.966791481, 36.877045315))
            ThreePointArc((74.966791481, 36.877045315), (75.835376919, 34.235337184), (75.942897572, 31.45657814))
            Line((75.942897572, 31.45657814), (77.186451478, 31.971675034))
        make_face()
    extrude(amount=FILLET2_DEPTH, mode=Mode.SUBTRACT)

    # Fillet2 2 outline → Fillet2 2 (revolve, cut)
    with BuildSketch(Plane.XZ):
        with BuildLine():
            ThreePointArc((82.2, 84.255), (83.203649133, 81.838397694), (83.546013048, 79.244160766))
            Line((83.546013048, 79.244160766), (83.546013048, 84.255))
            Line((83.546013048, 84.255), (82.2, 84.255))
        make_face()
        with BuildLine():
            Line((83.546013048, 0), (83.546013048, 5.010839234))
            ThreePointArc((83.546013048, 5.010839234), (83.203649133, 2.416602306), (82.2, 0))
            Line((82.2, 0), (83.546013048, 0))
        make_face()
    revolve(axis=Axis((0, 0, 0), (0, 0, 1)), mode=Mode.SUBTRACT)


with BuildPart() as cut_extrude1_piece_2:
    # of the separate pieces the step leaves, piece 2, a body of its own (cut_extrude1_pieces)
    add(part.part.solids().sort_by_distance((-25, 0, 0))[0])


solid = Compound([cut_extrude1_piece_1.part, cut_extrude1_piece_2.part])
